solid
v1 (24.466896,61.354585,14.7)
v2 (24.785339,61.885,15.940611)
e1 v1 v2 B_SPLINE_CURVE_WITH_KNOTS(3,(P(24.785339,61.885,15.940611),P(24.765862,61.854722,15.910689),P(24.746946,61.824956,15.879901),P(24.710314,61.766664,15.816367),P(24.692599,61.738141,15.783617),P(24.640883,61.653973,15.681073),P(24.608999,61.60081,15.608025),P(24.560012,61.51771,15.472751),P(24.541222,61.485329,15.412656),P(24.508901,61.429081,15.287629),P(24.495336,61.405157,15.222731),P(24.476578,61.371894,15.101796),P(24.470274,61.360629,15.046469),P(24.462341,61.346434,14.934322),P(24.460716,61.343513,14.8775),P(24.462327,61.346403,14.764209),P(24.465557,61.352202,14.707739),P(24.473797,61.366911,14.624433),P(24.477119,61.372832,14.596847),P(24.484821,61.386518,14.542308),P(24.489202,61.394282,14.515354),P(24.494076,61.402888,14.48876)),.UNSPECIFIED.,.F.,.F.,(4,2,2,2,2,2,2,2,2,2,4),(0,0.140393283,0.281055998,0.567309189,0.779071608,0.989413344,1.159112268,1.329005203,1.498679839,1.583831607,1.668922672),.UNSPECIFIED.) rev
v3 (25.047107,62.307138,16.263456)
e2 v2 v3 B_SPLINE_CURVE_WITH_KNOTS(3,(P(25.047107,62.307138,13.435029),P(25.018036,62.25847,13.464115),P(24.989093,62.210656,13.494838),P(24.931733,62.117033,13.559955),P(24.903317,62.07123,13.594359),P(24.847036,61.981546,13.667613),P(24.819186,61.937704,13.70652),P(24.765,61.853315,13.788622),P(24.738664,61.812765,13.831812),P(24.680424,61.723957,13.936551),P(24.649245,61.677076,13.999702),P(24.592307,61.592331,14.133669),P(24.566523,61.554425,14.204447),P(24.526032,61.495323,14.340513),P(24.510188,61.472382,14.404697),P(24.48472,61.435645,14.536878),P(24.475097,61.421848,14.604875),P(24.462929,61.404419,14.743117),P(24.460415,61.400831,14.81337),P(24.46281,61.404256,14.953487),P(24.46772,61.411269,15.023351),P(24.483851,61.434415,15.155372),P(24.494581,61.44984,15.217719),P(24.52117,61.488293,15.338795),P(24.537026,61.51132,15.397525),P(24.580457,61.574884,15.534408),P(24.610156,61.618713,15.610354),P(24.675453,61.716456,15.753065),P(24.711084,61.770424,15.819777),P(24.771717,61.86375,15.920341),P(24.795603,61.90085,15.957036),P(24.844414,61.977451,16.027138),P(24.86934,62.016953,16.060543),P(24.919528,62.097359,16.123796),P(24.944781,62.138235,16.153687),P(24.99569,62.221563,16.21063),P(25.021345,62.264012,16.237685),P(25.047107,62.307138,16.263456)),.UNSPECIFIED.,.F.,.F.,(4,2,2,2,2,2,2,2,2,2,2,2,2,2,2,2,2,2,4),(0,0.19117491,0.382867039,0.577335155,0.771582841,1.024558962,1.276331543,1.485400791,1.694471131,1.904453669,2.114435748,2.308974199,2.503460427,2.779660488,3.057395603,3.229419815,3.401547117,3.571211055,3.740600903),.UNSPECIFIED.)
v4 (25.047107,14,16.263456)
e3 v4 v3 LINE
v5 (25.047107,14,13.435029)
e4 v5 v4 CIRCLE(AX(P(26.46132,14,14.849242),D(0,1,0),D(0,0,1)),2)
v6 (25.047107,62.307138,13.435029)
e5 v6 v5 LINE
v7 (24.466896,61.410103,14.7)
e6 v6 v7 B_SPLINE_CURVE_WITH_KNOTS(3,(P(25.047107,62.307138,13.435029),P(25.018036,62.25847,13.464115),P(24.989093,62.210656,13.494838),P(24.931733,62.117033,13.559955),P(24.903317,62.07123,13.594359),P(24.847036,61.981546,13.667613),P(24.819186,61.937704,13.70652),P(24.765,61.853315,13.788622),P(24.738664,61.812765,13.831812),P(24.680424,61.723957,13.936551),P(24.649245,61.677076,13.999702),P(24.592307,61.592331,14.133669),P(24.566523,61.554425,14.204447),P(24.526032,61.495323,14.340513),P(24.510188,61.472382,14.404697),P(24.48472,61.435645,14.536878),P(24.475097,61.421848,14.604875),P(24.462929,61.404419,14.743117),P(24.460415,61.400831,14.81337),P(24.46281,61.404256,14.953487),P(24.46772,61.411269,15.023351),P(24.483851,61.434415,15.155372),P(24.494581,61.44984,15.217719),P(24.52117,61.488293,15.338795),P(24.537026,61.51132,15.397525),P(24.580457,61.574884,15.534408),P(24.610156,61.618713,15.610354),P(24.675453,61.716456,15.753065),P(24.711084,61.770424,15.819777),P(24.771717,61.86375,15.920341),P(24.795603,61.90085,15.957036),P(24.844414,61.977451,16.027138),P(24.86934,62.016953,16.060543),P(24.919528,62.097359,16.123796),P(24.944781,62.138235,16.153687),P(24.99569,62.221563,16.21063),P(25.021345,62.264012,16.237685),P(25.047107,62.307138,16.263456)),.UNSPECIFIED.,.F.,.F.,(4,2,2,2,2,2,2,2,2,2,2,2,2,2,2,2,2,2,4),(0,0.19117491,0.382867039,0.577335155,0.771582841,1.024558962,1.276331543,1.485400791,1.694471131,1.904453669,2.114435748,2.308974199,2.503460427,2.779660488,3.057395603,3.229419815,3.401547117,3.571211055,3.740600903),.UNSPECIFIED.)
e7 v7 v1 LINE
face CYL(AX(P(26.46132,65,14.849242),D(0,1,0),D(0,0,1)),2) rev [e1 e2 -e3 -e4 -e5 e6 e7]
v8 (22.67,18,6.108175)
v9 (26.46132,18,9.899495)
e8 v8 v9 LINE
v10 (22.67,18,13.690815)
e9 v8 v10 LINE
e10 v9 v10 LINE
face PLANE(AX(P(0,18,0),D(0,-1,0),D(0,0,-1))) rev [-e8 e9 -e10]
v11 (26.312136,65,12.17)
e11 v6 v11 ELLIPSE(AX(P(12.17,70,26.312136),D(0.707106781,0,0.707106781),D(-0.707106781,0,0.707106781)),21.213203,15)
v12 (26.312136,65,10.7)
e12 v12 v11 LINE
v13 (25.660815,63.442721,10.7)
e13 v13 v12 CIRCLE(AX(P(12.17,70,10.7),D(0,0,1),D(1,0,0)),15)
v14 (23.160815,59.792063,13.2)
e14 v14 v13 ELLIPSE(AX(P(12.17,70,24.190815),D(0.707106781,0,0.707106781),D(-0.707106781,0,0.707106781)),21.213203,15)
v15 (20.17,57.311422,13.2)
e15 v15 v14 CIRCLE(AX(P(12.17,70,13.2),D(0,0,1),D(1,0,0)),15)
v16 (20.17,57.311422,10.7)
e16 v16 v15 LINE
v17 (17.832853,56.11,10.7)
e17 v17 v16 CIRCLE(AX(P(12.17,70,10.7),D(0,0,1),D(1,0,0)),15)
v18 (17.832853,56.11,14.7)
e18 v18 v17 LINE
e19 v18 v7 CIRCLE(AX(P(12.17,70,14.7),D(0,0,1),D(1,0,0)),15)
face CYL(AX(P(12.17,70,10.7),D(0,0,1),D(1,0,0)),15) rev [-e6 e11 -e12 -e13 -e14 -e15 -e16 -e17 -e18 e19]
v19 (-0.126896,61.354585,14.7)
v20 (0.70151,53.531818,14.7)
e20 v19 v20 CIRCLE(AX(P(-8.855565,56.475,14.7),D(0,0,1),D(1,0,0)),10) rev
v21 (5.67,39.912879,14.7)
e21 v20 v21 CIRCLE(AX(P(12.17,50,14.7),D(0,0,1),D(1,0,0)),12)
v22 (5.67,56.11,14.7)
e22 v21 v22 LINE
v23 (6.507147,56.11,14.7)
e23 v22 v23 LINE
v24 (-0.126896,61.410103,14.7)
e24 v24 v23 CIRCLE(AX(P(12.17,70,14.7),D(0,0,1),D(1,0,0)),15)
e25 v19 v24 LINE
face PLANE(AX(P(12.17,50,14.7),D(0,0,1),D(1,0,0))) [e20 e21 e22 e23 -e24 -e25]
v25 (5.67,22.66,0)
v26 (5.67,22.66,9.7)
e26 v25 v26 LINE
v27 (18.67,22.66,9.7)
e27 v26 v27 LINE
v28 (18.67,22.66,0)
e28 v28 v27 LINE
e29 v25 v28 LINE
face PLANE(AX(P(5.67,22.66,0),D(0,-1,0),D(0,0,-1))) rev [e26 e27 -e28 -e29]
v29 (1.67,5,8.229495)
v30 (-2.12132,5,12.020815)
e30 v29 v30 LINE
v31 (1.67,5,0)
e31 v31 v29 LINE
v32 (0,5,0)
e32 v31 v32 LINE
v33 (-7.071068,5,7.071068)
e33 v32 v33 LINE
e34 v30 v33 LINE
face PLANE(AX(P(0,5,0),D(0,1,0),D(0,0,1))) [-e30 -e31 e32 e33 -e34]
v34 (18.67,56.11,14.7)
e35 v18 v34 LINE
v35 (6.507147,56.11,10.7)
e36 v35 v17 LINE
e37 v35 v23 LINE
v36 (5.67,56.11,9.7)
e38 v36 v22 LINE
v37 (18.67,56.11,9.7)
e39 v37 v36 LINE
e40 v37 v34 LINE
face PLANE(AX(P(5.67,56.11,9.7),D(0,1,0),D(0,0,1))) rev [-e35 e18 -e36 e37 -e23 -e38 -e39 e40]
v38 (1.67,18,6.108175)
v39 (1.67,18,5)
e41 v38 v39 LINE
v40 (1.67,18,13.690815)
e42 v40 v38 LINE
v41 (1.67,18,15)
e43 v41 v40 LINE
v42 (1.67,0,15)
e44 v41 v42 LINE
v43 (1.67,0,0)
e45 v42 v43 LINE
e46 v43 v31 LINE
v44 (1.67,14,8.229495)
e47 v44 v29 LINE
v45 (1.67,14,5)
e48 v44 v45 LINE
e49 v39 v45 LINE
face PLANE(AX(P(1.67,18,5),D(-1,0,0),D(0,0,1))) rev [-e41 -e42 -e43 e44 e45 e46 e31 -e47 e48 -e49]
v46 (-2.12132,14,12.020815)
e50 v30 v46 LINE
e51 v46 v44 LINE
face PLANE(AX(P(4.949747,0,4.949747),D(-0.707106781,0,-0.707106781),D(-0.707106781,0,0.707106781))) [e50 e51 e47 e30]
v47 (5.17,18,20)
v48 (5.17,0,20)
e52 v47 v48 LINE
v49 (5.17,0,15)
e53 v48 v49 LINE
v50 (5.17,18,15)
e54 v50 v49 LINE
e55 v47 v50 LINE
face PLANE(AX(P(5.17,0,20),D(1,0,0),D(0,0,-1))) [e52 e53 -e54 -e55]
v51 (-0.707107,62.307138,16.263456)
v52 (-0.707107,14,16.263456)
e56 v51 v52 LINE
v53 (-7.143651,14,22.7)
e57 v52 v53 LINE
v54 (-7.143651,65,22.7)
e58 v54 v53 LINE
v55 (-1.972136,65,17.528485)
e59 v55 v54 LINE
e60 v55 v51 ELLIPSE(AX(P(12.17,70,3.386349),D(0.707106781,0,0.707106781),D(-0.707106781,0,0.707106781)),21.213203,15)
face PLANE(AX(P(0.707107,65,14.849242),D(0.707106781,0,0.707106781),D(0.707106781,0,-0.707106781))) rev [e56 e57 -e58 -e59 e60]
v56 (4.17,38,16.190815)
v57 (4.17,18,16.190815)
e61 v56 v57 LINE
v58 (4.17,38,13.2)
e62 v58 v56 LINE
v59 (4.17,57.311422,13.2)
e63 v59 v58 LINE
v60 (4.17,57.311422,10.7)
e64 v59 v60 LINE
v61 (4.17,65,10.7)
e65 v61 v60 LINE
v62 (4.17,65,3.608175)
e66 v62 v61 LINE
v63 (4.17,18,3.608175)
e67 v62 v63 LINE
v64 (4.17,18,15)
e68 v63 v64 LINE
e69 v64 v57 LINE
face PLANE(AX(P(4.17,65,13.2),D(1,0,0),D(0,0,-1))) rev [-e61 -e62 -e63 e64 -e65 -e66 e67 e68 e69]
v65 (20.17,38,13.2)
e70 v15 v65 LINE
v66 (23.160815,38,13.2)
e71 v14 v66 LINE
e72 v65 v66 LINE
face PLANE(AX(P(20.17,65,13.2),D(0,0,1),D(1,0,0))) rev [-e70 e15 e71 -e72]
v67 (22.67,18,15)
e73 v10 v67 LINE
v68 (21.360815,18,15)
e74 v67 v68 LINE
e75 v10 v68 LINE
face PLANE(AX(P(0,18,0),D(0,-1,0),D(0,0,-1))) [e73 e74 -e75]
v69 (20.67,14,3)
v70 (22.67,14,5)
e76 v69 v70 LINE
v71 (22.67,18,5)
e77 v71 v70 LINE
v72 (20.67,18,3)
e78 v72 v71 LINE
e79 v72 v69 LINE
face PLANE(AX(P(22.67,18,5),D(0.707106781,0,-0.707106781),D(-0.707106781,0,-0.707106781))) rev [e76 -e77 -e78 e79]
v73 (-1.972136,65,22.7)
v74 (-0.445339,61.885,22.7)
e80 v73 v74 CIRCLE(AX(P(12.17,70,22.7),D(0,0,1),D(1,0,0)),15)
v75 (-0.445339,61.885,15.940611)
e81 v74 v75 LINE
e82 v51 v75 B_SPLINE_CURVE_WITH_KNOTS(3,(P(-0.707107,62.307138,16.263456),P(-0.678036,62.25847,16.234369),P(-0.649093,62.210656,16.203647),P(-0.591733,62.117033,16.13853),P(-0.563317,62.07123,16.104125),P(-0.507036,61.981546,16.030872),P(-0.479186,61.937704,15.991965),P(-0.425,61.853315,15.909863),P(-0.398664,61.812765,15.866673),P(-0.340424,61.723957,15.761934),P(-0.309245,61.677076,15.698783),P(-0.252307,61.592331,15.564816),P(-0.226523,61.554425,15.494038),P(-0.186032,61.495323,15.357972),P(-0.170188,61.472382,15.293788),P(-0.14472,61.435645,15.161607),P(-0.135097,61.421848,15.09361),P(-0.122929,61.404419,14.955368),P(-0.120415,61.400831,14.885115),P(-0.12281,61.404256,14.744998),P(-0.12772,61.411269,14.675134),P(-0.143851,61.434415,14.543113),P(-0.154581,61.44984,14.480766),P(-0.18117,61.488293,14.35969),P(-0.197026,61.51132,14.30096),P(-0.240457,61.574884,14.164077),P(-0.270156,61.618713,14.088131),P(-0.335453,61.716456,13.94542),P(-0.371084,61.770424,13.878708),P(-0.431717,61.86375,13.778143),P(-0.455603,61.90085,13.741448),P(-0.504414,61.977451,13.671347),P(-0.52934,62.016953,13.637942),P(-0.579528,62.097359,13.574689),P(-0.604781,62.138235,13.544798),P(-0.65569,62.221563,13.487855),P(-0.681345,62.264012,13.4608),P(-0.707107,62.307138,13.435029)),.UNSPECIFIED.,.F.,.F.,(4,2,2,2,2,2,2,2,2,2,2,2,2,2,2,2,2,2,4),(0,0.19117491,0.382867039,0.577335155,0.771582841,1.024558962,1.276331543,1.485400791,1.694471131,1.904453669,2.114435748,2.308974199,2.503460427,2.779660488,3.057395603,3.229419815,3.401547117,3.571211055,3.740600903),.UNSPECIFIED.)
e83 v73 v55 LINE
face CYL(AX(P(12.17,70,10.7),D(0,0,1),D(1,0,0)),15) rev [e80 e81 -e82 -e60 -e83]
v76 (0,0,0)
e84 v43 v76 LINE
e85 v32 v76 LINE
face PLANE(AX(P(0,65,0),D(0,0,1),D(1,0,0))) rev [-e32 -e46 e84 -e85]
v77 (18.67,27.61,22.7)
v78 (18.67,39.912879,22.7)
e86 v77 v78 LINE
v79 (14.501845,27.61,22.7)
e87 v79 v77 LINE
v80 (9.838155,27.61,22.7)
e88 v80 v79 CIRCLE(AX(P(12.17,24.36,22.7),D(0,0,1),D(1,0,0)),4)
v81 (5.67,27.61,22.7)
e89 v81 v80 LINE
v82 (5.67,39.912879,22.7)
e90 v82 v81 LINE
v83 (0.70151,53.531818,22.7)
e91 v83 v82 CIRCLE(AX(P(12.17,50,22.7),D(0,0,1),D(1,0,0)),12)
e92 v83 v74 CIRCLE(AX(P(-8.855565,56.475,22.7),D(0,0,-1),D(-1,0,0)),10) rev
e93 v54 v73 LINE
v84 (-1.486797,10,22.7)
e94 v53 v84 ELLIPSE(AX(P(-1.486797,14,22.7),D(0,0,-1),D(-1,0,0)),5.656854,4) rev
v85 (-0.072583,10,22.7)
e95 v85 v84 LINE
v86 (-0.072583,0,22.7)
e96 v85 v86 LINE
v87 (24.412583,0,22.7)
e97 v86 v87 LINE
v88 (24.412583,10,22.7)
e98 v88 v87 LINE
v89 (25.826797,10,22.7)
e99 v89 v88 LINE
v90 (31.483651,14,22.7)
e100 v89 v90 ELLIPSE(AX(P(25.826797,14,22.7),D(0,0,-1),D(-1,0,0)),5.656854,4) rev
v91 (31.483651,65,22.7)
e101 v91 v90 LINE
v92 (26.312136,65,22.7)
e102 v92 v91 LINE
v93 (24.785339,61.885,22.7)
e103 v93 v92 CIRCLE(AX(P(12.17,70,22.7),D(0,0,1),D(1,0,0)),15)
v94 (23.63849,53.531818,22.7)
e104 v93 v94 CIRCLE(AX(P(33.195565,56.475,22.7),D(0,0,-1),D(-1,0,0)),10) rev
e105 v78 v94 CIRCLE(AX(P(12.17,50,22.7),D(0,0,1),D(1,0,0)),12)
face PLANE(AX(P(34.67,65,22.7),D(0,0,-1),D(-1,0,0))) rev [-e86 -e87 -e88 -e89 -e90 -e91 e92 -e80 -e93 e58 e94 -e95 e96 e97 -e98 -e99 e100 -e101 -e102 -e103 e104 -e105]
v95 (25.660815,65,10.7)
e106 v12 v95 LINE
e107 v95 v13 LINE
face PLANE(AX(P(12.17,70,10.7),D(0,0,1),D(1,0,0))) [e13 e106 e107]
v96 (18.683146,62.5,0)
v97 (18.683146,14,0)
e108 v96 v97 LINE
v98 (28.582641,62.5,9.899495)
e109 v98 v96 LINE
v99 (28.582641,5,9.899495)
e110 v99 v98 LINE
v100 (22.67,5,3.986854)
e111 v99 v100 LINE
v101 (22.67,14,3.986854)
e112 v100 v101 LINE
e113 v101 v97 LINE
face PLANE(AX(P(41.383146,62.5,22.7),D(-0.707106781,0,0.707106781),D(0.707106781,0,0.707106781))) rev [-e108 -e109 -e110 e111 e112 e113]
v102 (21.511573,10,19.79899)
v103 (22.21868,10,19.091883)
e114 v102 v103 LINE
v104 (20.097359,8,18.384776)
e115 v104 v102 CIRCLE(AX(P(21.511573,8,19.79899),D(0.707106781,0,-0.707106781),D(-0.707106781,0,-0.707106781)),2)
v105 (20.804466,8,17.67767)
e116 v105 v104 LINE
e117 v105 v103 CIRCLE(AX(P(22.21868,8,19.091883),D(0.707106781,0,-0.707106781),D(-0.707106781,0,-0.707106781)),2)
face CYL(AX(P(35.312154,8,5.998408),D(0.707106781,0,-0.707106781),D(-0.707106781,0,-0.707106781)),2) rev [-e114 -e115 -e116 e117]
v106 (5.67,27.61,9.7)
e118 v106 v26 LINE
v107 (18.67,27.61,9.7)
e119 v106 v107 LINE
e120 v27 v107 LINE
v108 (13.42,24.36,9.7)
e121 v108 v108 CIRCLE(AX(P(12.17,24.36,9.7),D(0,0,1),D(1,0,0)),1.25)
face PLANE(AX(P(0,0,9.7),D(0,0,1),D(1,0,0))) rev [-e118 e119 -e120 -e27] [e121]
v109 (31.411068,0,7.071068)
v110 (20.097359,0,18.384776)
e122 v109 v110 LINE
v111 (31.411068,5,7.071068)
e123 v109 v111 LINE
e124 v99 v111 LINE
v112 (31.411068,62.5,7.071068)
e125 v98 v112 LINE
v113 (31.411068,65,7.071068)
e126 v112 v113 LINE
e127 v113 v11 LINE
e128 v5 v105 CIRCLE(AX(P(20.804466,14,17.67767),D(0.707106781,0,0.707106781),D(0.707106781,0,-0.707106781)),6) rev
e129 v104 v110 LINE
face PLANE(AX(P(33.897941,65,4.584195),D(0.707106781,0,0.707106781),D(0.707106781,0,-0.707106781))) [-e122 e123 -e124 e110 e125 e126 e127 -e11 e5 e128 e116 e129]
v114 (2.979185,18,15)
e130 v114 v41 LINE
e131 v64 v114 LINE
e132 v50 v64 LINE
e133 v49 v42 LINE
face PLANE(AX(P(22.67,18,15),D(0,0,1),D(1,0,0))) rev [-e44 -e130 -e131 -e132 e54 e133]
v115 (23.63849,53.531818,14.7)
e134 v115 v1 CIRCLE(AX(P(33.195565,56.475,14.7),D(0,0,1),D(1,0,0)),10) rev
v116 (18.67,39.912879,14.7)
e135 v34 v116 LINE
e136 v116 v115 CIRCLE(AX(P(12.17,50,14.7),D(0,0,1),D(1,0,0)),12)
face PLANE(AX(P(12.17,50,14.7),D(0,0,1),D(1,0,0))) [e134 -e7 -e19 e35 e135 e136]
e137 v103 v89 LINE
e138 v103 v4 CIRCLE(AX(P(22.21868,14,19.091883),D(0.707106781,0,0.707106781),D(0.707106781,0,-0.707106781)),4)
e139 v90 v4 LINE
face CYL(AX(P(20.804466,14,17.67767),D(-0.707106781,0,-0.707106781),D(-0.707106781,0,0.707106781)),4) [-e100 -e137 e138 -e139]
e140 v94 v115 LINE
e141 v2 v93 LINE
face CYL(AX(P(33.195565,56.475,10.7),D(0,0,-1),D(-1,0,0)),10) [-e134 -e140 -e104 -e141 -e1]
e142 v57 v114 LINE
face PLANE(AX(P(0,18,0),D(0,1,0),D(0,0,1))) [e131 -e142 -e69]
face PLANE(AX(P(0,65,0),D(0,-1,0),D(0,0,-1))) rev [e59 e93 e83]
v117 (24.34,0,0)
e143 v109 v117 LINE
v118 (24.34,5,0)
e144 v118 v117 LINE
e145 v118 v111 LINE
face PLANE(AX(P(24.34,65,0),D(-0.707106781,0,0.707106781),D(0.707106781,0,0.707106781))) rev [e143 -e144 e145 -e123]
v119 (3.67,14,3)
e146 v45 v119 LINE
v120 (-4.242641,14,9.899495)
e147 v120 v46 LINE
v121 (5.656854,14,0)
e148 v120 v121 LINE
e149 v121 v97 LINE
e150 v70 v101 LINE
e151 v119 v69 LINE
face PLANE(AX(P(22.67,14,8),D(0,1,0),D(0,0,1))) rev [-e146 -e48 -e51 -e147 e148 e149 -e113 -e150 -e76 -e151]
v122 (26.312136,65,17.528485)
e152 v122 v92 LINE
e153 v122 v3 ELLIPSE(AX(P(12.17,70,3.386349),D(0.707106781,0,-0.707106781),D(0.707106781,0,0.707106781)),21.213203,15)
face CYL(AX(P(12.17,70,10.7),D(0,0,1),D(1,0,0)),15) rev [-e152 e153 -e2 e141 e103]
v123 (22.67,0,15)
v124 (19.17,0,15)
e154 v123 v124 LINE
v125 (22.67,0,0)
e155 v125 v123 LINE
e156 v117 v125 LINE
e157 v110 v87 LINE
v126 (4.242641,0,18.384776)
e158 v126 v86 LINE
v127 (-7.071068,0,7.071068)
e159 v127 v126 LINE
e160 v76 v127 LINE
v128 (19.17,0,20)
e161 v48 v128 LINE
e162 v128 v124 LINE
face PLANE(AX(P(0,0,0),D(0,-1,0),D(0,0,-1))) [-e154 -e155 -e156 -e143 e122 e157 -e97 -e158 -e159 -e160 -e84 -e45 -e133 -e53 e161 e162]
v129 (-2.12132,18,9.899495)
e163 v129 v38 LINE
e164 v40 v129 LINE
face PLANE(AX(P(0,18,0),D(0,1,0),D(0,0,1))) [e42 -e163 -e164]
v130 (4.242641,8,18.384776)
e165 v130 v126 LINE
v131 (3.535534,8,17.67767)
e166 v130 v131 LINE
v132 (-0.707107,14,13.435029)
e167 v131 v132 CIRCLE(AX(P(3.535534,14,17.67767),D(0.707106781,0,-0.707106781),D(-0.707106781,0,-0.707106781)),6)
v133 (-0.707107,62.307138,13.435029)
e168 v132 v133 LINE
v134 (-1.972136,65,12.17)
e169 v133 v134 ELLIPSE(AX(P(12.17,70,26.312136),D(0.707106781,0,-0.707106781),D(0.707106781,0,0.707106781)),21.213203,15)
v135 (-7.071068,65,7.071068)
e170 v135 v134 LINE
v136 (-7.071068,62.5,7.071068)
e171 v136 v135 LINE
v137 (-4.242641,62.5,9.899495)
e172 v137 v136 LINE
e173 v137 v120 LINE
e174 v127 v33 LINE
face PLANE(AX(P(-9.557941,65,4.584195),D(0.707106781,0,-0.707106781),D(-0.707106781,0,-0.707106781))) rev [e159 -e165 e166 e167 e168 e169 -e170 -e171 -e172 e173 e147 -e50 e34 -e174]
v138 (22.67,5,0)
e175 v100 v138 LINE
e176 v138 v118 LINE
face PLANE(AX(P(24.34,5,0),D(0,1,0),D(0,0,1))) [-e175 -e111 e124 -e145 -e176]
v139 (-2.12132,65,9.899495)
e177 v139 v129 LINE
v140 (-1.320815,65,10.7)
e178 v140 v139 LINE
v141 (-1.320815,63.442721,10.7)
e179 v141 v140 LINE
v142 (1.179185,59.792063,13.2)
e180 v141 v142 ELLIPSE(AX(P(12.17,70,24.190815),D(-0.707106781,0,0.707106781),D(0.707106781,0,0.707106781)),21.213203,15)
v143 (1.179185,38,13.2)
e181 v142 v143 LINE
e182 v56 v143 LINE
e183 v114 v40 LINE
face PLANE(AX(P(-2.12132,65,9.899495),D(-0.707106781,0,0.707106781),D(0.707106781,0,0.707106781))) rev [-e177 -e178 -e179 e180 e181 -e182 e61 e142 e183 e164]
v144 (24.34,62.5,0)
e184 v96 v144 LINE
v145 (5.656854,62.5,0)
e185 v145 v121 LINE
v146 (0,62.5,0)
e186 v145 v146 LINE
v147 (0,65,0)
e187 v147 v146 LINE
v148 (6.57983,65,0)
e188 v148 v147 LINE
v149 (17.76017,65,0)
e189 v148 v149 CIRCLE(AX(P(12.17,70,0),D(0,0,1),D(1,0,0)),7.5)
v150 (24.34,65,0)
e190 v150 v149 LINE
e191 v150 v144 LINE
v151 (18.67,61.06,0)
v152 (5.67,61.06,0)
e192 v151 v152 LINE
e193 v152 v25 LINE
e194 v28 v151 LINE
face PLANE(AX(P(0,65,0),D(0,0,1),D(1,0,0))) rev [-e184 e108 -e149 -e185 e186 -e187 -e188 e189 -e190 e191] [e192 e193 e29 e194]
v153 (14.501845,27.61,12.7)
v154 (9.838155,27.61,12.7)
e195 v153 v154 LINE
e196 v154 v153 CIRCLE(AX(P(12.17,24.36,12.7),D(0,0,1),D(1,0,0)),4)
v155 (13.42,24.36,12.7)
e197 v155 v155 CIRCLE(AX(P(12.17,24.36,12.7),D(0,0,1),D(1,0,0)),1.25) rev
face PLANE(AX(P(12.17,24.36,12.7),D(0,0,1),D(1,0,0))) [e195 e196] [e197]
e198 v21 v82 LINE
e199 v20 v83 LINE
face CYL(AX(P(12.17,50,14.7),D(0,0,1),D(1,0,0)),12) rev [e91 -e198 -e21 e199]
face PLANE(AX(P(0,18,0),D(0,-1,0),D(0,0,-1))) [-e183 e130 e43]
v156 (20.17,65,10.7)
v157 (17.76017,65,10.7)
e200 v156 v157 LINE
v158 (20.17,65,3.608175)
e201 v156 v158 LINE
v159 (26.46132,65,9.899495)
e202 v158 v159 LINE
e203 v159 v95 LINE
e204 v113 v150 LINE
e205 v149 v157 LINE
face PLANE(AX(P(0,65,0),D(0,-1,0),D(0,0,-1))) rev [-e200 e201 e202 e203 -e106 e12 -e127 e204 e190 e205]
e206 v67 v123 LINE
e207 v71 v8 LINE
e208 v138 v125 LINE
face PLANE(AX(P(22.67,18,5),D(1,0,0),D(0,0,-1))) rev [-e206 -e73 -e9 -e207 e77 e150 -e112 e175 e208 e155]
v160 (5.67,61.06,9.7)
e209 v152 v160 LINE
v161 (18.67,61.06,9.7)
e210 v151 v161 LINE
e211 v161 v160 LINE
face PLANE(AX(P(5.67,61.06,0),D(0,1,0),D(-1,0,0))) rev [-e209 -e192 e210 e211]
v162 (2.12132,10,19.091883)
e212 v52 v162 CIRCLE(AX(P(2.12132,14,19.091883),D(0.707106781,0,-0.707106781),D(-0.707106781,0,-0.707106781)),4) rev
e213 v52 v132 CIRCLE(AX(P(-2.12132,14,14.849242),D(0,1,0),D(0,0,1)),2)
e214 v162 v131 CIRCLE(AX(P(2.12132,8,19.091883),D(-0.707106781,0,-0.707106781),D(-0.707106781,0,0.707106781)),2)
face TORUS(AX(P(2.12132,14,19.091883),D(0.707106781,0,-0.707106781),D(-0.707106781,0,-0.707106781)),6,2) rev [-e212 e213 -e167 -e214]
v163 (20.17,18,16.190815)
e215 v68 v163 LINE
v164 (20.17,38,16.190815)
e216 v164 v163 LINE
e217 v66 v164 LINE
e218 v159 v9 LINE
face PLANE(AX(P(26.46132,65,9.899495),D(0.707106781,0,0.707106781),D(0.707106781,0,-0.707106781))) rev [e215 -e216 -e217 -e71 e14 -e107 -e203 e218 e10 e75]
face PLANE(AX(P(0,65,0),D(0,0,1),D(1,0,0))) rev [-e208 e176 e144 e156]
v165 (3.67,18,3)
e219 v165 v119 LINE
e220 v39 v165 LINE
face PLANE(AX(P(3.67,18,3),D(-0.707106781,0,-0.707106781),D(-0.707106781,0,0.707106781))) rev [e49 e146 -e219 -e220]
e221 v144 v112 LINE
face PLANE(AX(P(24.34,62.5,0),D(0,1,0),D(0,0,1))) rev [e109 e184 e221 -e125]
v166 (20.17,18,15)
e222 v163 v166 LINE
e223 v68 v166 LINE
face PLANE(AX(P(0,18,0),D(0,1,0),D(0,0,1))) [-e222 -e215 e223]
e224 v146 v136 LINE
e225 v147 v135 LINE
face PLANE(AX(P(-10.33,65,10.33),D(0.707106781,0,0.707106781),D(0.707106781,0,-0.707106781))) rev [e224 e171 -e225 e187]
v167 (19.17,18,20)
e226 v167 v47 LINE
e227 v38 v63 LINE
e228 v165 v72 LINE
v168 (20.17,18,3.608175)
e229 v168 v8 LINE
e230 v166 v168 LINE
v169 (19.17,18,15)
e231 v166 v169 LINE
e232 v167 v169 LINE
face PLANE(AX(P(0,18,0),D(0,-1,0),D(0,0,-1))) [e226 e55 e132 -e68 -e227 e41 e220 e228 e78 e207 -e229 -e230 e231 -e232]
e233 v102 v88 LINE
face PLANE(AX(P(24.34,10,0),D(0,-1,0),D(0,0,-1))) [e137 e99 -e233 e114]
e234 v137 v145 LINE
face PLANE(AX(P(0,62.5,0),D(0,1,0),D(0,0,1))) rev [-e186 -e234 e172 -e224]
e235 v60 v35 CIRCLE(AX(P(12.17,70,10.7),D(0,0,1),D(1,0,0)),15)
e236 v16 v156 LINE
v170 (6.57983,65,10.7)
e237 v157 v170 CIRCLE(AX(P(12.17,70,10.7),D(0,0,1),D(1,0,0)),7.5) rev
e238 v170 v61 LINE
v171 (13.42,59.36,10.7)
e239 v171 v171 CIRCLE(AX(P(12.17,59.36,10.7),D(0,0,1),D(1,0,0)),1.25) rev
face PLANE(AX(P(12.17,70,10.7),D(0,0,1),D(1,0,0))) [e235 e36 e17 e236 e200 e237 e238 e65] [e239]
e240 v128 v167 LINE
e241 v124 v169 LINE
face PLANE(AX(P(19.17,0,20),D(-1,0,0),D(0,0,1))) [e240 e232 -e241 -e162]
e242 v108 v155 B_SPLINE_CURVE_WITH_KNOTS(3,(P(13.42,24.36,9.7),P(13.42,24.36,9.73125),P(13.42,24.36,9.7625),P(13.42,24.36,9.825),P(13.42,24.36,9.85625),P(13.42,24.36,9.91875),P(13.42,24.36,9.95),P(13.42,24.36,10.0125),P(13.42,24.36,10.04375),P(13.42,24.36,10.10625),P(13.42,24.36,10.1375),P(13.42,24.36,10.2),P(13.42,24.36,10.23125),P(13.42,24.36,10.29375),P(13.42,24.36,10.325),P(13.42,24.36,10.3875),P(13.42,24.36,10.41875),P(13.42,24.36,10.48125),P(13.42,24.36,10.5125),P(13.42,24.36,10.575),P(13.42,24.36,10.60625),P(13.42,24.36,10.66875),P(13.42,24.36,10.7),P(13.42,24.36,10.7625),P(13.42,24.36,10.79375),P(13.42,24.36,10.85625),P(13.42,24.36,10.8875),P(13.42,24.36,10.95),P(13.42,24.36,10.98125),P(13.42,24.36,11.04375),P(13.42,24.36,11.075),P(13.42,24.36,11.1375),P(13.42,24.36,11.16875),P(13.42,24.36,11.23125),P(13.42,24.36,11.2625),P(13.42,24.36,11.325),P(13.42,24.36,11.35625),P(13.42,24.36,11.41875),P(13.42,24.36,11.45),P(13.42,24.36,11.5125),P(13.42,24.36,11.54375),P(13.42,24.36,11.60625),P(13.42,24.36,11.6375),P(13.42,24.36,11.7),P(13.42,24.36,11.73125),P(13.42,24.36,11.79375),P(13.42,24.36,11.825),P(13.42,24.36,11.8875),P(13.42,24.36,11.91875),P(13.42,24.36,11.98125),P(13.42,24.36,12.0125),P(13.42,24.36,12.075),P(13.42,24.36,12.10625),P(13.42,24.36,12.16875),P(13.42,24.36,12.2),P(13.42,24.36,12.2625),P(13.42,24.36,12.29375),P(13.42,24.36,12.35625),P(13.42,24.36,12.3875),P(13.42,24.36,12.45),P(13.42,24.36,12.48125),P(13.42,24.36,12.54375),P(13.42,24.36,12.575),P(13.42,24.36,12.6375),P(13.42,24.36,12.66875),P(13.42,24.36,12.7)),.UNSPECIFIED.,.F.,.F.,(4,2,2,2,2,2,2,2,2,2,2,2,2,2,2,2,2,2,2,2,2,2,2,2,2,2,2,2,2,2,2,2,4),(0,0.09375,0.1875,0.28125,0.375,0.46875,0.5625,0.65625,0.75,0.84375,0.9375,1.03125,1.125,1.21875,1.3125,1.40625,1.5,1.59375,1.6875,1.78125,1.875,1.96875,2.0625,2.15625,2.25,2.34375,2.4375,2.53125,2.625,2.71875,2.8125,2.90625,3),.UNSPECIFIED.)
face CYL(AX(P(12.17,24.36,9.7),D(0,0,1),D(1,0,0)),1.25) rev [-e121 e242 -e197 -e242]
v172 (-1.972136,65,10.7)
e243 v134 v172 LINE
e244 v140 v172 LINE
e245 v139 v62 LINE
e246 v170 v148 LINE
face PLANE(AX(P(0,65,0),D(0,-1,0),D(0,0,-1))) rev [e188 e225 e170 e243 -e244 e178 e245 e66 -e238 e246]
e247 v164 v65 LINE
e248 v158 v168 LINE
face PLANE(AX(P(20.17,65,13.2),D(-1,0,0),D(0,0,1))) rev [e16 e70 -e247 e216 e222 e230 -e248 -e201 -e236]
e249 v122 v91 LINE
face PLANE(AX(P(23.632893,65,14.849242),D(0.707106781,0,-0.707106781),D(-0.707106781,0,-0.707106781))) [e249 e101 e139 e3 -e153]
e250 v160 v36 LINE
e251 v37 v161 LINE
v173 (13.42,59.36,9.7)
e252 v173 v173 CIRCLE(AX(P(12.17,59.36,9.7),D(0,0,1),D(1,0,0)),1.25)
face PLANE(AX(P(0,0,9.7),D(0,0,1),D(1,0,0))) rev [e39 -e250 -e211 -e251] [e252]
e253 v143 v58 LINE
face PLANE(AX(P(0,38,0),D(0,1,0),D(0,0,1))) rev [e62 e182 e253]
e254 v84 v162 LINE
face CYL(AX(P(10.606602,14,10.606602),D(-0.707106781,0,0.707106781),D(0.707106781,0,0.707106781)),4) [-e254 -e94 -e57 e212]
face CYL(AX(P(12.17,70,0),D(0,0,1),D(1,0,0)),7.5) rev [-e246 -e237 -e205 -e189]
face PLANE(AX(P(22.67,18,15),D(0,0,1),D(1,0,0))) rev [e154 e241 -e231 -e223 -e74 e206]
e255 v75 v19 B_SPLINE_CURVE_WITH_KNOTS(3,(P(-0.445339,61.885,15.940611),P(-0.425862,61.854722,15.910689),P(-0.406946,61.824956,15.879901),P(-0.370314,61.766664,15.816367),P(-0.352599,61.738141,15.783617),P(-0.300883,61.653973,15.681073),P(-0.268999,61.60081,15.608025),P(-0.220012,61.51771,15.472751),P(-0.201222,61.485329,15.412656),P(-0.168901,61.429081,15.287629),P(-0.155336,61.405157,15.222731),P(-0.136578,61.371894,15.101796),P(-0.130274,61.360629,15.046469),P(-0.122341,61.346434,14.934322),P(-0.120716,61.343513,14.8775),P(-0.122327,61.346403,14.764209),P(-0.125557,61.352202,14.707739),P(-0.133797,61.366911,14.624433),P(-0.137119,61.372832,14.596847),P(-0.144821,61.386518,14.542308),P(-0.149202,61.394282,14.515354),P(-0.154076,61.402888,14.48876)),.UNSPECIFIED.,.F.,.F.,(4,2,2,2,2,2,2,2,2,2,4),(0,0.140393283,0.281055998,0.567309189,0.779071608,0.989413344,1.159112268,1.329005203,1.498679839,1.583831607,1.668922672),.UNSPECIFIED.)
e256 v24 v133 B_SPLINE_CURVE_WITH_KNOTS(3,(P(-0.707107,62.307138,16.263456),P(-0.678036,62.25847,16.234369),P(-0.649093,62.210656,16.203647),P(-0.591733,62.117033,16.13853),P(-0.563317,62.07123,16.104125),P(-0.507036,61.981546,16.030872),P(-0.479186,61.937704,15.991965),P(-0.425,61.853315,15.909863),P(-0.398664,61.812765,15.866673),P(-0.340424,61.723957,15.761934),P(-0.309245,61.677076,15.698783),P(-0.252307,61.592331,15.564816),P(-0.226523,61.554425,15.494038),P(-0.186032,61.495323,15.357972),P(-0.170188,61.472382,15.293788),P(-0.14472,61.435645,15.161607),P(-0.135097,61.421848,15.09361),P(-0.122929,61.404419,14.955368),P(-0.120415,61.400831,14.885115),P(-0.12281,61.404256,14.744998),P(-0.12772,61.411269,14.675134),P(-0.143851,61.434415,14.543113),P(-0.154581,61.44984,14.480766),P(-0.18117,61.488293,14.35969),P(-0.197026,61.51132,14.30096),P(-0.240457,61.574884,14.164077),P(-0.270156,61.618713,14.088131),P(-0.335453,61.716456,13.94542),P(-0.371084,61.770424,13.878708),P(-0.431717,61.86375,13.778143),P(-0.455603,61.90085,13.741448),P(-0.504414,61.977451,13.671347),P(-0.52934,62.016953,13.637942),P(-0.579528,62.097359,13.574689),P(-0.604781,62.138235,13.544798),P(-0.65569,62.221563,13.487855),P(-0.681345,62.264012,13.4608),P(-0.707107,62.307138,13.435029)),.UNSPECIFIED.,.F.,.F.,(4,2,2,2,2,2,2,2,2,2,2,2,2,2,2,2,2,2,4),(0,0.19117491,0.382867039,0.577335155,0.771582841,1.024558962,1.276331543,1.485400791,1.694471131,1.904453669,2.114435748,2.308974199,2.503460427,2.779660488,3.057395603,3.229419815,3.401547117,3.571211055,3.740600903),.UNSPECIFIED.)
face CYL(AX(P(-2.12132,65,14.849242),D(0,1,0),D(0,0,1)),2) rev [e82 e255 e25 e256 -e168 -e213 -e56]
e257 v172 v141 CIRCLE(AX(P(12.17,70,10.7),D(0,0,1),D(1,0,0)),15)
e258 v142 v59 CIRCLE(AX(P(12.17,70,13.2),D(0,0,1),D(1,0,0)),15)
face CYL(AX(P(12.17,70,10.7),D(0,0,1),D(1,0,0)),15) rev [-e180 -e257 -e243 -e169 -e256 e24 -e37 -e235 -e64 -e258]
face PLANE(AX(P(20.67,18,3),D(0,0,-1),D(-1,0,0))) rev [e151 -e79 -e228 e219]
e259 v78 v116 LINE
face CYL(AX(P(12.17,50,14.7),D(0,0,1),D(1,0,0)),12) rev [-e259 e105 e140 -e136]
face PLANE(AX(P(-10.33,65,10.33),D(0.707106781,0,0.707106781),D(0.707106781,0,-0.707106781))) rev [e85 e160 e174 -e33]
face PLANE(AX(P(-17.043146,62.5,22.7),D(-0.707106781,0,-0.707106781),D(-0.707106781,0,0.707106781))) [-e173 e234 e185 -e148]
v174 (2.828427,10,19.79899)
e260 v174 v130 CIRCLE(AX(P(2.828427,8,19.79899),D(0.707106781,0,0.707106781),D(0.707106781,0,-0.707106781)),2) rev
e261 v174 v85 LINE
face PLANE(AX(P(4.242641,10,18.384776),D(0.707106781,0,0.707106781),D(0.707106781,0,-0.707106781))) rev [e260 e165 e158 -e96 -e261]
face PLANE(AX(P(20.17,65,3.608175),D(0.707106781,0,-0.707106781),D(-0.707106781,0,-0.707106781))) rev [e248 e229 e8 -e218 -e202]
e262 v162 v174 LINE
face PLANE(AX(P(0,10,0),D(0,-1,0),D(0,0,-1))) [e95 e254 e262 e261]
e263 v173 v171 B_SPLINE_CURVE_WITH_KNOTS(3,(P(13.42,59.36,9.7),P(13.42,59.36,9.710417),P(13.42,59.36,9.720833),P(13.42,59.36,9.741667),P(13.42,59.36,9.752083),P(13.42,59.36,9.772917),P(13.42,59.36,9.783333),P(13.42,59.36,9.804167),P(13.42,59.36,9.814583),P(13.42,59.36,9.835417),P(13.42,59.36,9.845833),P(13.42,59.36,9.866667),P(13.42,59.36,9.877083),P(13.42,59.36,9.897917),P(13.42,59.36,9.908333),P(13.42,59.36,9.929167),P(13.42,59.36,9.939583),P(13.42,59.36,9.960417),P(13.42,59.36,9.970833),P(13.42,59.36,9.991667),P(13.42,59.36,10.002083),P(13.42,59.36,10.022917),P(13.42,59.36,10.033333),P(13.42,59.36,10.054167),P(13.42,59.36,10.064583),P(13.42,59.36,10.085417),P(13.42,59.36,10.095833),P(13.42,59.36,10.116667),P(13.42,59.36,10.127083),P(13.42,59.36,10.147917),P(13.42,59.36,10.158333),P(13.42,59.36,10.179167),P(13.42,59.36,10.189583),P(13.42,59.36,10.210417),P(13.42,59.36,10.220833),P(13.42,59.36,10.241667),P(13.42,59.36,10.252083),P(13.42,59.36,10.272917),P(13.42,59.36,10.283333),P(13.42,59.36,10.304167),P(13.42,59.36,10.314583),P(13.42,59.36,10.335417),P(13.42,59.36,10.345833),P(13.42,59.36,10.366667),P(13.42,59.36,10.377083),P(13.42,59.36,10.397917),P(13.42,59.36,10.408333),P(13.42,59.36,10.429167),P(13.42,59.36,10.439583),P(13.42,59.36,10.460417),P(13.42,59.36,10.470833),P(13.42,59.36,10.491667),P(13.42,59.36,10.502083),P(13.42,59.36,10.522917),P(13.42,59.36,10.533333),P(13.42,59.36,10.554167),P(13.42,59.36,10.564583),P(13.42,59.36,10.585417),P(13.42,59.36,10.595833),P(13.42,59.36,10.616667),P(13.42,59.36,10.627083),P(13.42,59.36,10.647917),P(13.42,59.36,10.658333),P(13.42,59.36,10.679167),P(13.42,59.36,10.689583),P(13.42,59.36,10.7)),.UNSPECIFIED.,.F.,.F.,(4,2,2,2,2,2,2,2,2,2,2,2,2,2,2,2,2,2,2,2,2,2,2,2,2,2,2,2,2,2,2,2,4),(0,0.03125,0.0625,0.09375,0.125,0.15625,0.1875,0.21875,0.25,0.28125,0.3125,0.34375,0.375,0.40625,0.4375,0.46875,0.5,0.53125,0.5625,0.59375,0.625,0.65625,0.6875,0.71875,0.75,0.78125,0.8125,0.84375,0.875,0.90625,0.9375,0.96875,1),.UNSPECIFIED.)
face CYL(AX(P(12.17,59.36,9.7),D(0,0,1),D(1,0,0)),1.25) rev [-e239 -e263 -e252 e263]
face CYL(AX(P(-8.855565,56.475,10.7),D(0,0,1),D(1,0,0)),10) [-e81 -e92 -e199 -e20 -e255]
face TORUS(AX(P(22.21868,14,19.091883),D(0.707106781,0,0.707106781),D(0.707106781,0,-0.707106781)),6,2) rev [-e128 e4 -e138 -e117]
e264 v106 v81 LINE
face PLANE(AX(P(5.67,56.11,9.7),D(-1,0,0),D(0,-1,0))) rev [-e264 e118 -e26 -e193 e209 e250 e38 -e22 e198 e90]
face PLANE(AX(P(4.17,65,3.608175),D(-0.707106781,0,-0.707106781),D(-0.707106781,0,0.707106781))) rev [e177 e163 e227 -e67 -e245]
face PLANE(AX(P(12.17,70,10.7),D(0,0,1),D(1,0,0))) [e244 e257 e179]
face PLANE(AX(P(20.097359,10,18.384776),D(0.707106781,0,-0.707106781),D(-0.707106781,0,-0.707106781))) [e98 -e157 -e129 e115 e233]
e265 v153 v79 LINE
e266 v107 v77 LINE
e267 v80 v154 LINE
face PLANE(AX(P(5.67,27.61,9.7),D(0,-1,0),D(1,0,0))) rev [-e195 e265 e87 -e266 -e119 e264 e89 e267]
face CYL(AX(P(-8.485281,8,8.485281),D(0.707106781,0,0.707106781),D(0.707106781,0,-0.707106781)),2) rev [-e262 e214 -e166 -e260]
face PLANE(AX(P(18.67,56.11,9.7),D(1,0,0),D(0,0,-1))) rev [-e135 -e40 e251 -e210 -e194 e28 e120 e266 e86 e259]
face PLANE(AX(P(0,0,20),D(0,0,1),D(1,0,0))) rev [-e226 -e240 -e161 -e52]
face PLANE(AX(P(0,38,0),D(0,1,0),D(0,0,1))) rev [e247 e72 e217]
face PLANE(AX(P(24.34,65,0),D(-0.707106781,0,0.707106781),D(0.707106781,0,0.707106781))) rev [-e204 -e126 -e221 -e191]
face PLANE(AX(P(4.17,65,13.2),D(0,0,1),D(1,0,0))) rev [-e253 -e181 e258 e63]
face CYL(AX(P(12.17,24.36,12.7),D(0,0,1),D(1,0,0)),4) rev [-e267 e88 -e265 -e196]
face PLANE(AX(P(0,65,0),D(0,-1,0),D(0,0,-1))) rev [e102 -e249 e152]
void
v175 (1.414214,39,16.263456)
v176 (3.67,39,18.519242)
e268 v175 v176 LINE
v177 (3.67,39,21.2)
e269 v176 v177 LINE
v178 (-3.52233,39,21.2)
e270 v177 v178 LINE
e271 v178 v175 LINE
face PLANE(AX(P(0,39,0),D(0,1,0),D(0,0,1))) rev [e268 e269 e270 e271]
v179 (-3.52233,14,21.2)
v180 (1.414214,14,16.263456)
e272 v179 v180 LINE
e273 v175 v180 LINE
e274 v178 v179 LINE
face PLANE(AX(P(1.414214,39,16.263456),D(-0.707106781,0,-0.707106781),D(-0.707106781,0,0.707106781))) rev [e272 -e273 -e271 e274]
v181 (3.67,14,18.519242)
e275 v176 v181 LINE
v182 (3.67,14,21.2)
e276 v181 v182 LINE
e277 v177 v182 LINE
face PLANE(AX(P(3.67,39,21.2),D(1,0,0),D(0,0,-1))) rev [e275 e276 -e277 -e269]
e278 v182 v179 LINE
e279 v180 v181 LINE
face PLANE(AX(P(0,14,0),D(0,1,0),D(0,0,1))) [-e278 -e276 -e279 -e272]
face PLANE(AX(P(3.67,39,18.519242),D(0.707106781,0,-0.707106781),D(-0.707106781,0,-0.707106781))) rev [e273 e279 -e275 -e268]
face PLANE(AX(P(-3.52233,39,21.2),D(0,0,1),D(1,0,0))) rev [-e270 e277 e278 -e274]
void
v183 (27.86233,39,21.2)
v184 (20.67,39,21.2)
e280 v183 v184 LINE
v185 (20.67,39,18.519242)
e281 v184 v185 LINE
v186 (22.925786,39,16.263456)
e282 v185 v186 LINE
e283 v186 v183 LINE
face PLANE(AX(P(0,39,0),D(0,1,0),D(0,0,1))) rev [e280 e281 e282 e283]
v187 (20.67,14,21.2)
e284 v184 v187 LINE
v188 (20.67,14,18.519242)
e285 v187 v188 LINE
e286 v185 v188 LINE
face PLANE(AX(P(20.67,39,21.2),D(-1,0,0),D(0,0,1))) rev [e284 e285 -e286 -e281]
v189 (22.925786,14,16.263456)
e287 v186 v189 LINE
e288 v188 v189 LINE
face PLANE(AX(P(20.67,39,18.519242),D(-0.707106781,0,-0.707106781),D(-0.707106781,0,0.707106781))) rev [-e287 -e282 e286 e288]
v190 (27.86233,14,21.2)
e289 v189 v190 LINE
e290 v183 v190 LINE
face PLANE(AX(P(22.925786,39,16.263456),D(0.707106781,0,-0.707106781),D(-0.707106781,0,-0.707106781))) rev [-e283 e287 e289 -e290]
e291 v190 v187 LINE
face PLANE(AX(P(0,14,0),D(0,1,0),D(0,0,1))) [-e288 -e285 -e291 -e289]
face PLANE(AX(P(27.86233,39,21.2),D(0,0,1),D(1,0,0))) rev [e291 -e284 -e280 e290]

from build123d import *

# Parameters (mm, degrees)
EXTRUDE_1_DEPTH        = 65
CUT_EXTRUDE_1_DEPTH    = 57.5
SKETCH_4_R             = 1.25
SKETCH_4_W             = 13
SKETCH_4_H             = 28.5
CUT_EXTRUDE_2_DEPTH    = 13
SKETCH_9_W             = 13
SKETCH_9_H             = 38.4
CUT_EXTRUDE_6_DEPTH    = 75.806476324
CUT_EXTRUDE_7_DEPTH    = 18
SKETCH_13_W            = 21
SKETCH_13_H            = 5
CUT_EXTRUDE_10_DEPTH   = 18
CUT_EXTRUDE_8_DEPTH    = 78.086308123
CUT_EXTRUDE_9_DEPTH    = 10
FILLET_1_R             = 4
FILLET_1_OF_MIRROR_3_R = 4
SKETCH_21_W            = 21
SKETCH_21_H            = 14
CUT_EXTRUDE_17_DEPTH   = 8
SKETCH_17_W            = 19.798748342
SKETCH_17_H            = 9
CUT_EXTRUDE_13_DEPTH   = 3
SKETCH_18_W            = 14
SKETCH_18_H            = 18
CUT_EXTRUDE_14_DEPTH   = 5
SKETCH_19_R            = 4
CUT_EXTRUDE_15_DEPTH   = 10
FILLET_6_R             = 2
SKETCH_5_R             = 12
CUT_EXTRUDE_3_DEPTH    = 8
CUT_EXTRUDE_16_DEPTH   = 61.954985592
CUT_EXTRUDE_18_DEPTH   = 25
CUT_EXTRUDE_19_DEPTH   = 20
CUT_EXTRUDE_5_DEPTH    = 76.706738594
CUT_EXTRUDE_20_DEPTH   = 12
FILLET_5_R             = 10


with BuildPart() as part:
    # 草圖1 → 填料-伸長1 (new body)
    with BuildSketch(Plane(origin=(0, 0, 0), x_dir=(1, 0, 0), z_dir=(0, 1, 0))):
        Polygon((0, 0), (24.34, 0), (34.67, -10.33), (34.67, -22.7), (-10.33, -22.7), (-10.33, -10.33), align=None)
    extrude(amount=EXTRUDE_1_DEPTH)

    # 草圖2 → 除料-伸長1 (cut)
    with BuildSketch(Plane(origin=(0, 5, 0), x_dir=(1, 0, 0), z_dir=(0, 1, 0))):
        Polygon((0, 0), (-22.7, -22.7), (-17.043145751, -22.7), (5.656854249, 0), align=None)
    cut_extrude_1 = extrude(amount=CUT_EXTRUDE_1_DEPTH, mode=Mode.SUBTRACT)

    # 鏡射1: 除料-伸長1 across plane
    add(cut_extrude_1.mirror(Plane.ZY.offset(-12.17)), mode=Mode.SUBTRACT)

    # 草圖4 → 除料-伸長2 (cut)
    with BuildSketch(Plane.XY.offset(22.7)):
        with Locations((12.17, 59.36)):
            Circle(SKETCH_4_R)
        with Locations((12.17, 24.36)):
            Circle(SKETCH_4_R)
        with Locations((12.17, 41.86)):
            Rectangle(SKETCH_4_W, SKETCH_4_H)
    extrude(amount=-CUT_EXTRUDE_2_DEPTH, mode=Mode.SUBTRACT)

    # 草圖9 → 除料-伸長6 (cut, through all)
    with BuildSketch(Plane.XY.offset(9.7)):
        with Locations((12.17, 41.86)):
            Rectangle(SKETCH_9_W, SKETCH_9_H)
    extrude(amount=-CUT_EXTRUDE_6_DEPTH, mode=Mode.SUBTRACT)

    # 草圖10 → 除料-伸長7 (cut)
    with BuildSketch(Plane.XZ):
        Polygon((20.67, 3), (3.67, 3), (1.67, 5), (1.67, 10), (22.67, 10), (22.67, 5), align=None)
    extrude(amount=-CUT_EXTRUDE_7_DEPTH, mode=Mode.SUBTRACT)

    # 草圖13 → 除料-伸長10 (cut)
    with BuildSketch(Plane.XZ):
        with Locations((12.17, 12.5)):
            Rectangle(SKETCH_13_W, SKETCH_13_H)
    extrude(amount=-CUT_EXTRUDE_10_DEPTH, mode=Mode.SUBTRACT)

    # 草圖11 → 除料-伸長8 (cut, through all)
    with BuildSketch(Plane.XZ):
        Polygon((-9.55794071, 4.584194914), (-25.114289896, 20.1405441), (-14.849242405, 30.405591591), (0.707106781, 14.849242405), align=None)
    cut_extrude_8 = extrude(amount=-CUT_EXTRUDE_8_DEPTH, mode=Mode.SUBTRACT)

    # 草圖12 → 除料-伸長9 (cut)
    with BuildSketch(Plane.XZ):
        Polygon((-4.242640687, 9.899494937), (-19.798989873, 25.455844123), (-11.313708499, 33.941125497), (4.242640687, 18.384776311), align=None)
    cut_extrude_9 = extrude(amount=-CUT_EXTRUDE_9_DEPTH, mode=Mode.SUBTRACT)

    # 圓角1
    fillet_1_edges = [part.edges().sort_by_distance(p)[0] for p in [
        (-3.218272016, 10, 18.774621202),
    ]]
    fillet(fillet_1_edges, radius=FILLET_1_R)

    # 鏡射3: 除料-伸長8, 除料-伸長9 across plane
    add(cut_extrude_8.mirror(Plane.ZY.offset(-12.17)), mode=Mode.SUBTRACT)
    add(cut_extrude_9.mirror(Plane.ZY.offset(-12.17)), mode=Mode.SUBTRACT)

    # 圓角1 of 鏡射3
    fillet_1_of_mirror_3_edges = [part.edges().sort_by_distance(p)[0] for p in [
        (27.558272016, 10, 18.774621202),
    ]]
    fillet(fillet_1_of_mirror_3_edges, radius=FILLET_1_OF_MIRROR_3_R)

    # 草圖21 → 除料-伸長17 (cut)
    with BuildSketch(Plane(origin=(0, 0, 0), x_dir=(-1, 0, 0), z_dir=(0, 0, -1))):
        with Locations((-12.17, 7)):
            Rectangle(SKETCH_21_W, SKETCH_21_H)
    extrude(amount=-CUT_EXTRUDE_17_DEPTH, mode=Mode.SUBTRACT)

    # 草圖17 → 除料-伸長13 (cut)
    with BuildSketch(Plane(origin=(2.828427125, 0, 2.828427125), x_dir=(-0.7071067811865472, 0, 0.7071067811865479), z_dir=(-0.7071067811865479, 0, -0.7071067811865472))):
        with Locations((11.537637522, 9.5)):
            Rectangle(SKETCH_17_W, SKETCH_17_H)
    extrude(amount=-CUT_EXTRUDE_13_DEPTH, mode=Mode.SUBTRACT)

    # 草圖18 → 除料-伸長14 (cut)
    with BuildSketch(Plane.XY.offset(15)):
        with Locations((12.17, 9)):
            Rectangle(SKETCH_18_W, SKETCH_18_H)
    extrude(amount=CUT_EXTRUDE_14_DEPTH, mode=Mode.SUBTRACT)

    # 草圖19 → 除料-伸長15 (cut)
    with BuildSketch(Plane.XY.offset(22.7)):
        with Locations((12.17, 24.36)):
            Circle(SKETCH_19_R)
    extrude(amount=-CUT_EXTRUDE_15_DEPTH, mode=Mode.SUBTRACT)

    # 圓角6
    fillet_6_edges = [part.edges().sort_by_distance(p)[0] for p in [
        (0.707106781, 39.5, 14.849242405),
        (3.889087297, 10, 18.03122292),
        (1.535533906, 11.171572875, 15.67766953),
        (23.632893219, 39.5, 14.849242405),
        (20.450912703, 10, 18.03122292),
        (22.804466094, 11.171572875, 15.67766953),
    ]]
    fillet(fillet_6_edges, radius=FILLET_6_R)

    # 草圖5 → 除料-伸長3 (cut)
    with BuildSketch(Plane.XY.offset(22.7)):
        with Locations((12.17, 50)):
            Circle(SKETCH_5_R)
    extrude(amount=-CUT_EXTRUDE_3_DEPTH, mode=Mode.SUBTRACT)

    # 草圖20 → 除料-伸長16 (cut, through all)
    with BuildSketch(Plane.XZ.offset(-18)):
        Polygon((4.17, 3.608174593), (-2.121320344, 9.899494937), (1.17918472, 13.2), (4.17, 13.2), align=None)
        Polygon((20.17, 13.2), (23.16081528, 13.2), (26.461320344, 9.899494937), (20.17, 3.608174593), align=None)
    extrude(amount=-CUT_EXTRUDE_16_DEPTH, mode=Mode.SUBTRACT)

    # 草圖22 → 除料-伸長18 (cut)
    with BuildSketch(Plane.XZ.offset(-14)):
        Polygon((1.414213562, 16.263455967), (-3.52233047, 21.2), (3.67, 21.2), (3.67, 18.519242405), align=None)
        Polygon((27.86233047, 21.2), (20.67, 21.2), (20.67, 18.519242405), (22.925786438, 16.263455967), align=None)
    extrude(amount=-CUT_EXTRUDE_18_DEPTH, mode=Mode.SUBTRACT)

    # 草圖23 → 除料-伸長19 (cut)
    with BuildSketch(Plane.XZ.offset(-18)):
        Polygon((4.17, 13.2), (1.17918472, 13.2), (4.17, 16.19081528), align=None)
        Polygon((23.16081528, 13.2), (20.17, 16.19081528), (20.17, 13.2), align=None)
    extrude(amount=-CUT_EXTRUDE_19_DEPTH, mode=Mode.SUBTRACT)

    # 草圖8 → 除料-伸長5 (cut, through all)
    with BuildSketch(Plane.XY.offset(22.7)):
        with BuildLine():
            Line((4.67, 70), (4.67, 73.83732793))
            Line((4.67, 73.83732793), (19.67, 73.83732793))
            Line((19.67, 73.83732793), (19.67, 70))
            ThreePointArc((19.67, 70), (12.17, 62.5), (4.67, 70))
        make_face()
    extrude(amount=-CUT_EXTRUDE_5_DEPTH, mode=Mode.SUBTRACT)

    # 草圖7 → 除料-伸長20 (cut)
    with BuildSketch(Plane.XY.offset(22.7)):
        with BuildLine():
            Line((-2.83, 70), (27.17, 70))
            ThreePointArc((27.17, 70), (12.17, 55), (-2.83, 70))
        make_face()
    extrude(amount=-CUT_EXTRUDE_20_DEPTH, mode=Mode.SUBTRACT)

    # 圓角5
    # the kernel refuses this fillet: 10 mm, written as the material it takes off along each edge
    with BuildSketch(Plane(origin=(3.203430143, 57.975, 14.7), x_dir=(-0.6822618553726185, 0.7311078994946726, 0), z_dir=(0, 0, 1))) as fillet_5_piece_1:
        with BuildLine():
            CenterArc((7.130730412, 9.839819243), FILLET_5_R, 209.862696675, 49.868396236)
            ThreePointArc((-1.541480723, 4.86058697), (-0.50958274, 2.5131167), (0, 0))
            ThreePointArc((0, 0), (2.674023904, 0.240271135), (5.348047809, 0))
        make_face()
    extrude(amount=21.370119522, mode=Mode.SUBTRACT)
    with BuildSketch(Plane(origin=(21.136569857, 57.975, 14.7), x_dir=(0.490653030896535, -0.8713550385876264, 0), z_dir=(0, 0, 1))) as fillet_5_piece_2:
        with BuildLine():
            CenterArc((7.223814974, 9.771686454), FILLET_5_R, 207.864748404, 49.868396236)
            ThreePointArc((-1.616718622, 5.097826622), (-0.579329834, 2.621547444), (0, 0))
            ThreePointArc((0, 0), (2.549581756, 0.273976255), (5.099163511, 0))
        make_face()
    extrude(amount=21.370119522, mode=Mode.SUBTRACT)


solid = part.part
